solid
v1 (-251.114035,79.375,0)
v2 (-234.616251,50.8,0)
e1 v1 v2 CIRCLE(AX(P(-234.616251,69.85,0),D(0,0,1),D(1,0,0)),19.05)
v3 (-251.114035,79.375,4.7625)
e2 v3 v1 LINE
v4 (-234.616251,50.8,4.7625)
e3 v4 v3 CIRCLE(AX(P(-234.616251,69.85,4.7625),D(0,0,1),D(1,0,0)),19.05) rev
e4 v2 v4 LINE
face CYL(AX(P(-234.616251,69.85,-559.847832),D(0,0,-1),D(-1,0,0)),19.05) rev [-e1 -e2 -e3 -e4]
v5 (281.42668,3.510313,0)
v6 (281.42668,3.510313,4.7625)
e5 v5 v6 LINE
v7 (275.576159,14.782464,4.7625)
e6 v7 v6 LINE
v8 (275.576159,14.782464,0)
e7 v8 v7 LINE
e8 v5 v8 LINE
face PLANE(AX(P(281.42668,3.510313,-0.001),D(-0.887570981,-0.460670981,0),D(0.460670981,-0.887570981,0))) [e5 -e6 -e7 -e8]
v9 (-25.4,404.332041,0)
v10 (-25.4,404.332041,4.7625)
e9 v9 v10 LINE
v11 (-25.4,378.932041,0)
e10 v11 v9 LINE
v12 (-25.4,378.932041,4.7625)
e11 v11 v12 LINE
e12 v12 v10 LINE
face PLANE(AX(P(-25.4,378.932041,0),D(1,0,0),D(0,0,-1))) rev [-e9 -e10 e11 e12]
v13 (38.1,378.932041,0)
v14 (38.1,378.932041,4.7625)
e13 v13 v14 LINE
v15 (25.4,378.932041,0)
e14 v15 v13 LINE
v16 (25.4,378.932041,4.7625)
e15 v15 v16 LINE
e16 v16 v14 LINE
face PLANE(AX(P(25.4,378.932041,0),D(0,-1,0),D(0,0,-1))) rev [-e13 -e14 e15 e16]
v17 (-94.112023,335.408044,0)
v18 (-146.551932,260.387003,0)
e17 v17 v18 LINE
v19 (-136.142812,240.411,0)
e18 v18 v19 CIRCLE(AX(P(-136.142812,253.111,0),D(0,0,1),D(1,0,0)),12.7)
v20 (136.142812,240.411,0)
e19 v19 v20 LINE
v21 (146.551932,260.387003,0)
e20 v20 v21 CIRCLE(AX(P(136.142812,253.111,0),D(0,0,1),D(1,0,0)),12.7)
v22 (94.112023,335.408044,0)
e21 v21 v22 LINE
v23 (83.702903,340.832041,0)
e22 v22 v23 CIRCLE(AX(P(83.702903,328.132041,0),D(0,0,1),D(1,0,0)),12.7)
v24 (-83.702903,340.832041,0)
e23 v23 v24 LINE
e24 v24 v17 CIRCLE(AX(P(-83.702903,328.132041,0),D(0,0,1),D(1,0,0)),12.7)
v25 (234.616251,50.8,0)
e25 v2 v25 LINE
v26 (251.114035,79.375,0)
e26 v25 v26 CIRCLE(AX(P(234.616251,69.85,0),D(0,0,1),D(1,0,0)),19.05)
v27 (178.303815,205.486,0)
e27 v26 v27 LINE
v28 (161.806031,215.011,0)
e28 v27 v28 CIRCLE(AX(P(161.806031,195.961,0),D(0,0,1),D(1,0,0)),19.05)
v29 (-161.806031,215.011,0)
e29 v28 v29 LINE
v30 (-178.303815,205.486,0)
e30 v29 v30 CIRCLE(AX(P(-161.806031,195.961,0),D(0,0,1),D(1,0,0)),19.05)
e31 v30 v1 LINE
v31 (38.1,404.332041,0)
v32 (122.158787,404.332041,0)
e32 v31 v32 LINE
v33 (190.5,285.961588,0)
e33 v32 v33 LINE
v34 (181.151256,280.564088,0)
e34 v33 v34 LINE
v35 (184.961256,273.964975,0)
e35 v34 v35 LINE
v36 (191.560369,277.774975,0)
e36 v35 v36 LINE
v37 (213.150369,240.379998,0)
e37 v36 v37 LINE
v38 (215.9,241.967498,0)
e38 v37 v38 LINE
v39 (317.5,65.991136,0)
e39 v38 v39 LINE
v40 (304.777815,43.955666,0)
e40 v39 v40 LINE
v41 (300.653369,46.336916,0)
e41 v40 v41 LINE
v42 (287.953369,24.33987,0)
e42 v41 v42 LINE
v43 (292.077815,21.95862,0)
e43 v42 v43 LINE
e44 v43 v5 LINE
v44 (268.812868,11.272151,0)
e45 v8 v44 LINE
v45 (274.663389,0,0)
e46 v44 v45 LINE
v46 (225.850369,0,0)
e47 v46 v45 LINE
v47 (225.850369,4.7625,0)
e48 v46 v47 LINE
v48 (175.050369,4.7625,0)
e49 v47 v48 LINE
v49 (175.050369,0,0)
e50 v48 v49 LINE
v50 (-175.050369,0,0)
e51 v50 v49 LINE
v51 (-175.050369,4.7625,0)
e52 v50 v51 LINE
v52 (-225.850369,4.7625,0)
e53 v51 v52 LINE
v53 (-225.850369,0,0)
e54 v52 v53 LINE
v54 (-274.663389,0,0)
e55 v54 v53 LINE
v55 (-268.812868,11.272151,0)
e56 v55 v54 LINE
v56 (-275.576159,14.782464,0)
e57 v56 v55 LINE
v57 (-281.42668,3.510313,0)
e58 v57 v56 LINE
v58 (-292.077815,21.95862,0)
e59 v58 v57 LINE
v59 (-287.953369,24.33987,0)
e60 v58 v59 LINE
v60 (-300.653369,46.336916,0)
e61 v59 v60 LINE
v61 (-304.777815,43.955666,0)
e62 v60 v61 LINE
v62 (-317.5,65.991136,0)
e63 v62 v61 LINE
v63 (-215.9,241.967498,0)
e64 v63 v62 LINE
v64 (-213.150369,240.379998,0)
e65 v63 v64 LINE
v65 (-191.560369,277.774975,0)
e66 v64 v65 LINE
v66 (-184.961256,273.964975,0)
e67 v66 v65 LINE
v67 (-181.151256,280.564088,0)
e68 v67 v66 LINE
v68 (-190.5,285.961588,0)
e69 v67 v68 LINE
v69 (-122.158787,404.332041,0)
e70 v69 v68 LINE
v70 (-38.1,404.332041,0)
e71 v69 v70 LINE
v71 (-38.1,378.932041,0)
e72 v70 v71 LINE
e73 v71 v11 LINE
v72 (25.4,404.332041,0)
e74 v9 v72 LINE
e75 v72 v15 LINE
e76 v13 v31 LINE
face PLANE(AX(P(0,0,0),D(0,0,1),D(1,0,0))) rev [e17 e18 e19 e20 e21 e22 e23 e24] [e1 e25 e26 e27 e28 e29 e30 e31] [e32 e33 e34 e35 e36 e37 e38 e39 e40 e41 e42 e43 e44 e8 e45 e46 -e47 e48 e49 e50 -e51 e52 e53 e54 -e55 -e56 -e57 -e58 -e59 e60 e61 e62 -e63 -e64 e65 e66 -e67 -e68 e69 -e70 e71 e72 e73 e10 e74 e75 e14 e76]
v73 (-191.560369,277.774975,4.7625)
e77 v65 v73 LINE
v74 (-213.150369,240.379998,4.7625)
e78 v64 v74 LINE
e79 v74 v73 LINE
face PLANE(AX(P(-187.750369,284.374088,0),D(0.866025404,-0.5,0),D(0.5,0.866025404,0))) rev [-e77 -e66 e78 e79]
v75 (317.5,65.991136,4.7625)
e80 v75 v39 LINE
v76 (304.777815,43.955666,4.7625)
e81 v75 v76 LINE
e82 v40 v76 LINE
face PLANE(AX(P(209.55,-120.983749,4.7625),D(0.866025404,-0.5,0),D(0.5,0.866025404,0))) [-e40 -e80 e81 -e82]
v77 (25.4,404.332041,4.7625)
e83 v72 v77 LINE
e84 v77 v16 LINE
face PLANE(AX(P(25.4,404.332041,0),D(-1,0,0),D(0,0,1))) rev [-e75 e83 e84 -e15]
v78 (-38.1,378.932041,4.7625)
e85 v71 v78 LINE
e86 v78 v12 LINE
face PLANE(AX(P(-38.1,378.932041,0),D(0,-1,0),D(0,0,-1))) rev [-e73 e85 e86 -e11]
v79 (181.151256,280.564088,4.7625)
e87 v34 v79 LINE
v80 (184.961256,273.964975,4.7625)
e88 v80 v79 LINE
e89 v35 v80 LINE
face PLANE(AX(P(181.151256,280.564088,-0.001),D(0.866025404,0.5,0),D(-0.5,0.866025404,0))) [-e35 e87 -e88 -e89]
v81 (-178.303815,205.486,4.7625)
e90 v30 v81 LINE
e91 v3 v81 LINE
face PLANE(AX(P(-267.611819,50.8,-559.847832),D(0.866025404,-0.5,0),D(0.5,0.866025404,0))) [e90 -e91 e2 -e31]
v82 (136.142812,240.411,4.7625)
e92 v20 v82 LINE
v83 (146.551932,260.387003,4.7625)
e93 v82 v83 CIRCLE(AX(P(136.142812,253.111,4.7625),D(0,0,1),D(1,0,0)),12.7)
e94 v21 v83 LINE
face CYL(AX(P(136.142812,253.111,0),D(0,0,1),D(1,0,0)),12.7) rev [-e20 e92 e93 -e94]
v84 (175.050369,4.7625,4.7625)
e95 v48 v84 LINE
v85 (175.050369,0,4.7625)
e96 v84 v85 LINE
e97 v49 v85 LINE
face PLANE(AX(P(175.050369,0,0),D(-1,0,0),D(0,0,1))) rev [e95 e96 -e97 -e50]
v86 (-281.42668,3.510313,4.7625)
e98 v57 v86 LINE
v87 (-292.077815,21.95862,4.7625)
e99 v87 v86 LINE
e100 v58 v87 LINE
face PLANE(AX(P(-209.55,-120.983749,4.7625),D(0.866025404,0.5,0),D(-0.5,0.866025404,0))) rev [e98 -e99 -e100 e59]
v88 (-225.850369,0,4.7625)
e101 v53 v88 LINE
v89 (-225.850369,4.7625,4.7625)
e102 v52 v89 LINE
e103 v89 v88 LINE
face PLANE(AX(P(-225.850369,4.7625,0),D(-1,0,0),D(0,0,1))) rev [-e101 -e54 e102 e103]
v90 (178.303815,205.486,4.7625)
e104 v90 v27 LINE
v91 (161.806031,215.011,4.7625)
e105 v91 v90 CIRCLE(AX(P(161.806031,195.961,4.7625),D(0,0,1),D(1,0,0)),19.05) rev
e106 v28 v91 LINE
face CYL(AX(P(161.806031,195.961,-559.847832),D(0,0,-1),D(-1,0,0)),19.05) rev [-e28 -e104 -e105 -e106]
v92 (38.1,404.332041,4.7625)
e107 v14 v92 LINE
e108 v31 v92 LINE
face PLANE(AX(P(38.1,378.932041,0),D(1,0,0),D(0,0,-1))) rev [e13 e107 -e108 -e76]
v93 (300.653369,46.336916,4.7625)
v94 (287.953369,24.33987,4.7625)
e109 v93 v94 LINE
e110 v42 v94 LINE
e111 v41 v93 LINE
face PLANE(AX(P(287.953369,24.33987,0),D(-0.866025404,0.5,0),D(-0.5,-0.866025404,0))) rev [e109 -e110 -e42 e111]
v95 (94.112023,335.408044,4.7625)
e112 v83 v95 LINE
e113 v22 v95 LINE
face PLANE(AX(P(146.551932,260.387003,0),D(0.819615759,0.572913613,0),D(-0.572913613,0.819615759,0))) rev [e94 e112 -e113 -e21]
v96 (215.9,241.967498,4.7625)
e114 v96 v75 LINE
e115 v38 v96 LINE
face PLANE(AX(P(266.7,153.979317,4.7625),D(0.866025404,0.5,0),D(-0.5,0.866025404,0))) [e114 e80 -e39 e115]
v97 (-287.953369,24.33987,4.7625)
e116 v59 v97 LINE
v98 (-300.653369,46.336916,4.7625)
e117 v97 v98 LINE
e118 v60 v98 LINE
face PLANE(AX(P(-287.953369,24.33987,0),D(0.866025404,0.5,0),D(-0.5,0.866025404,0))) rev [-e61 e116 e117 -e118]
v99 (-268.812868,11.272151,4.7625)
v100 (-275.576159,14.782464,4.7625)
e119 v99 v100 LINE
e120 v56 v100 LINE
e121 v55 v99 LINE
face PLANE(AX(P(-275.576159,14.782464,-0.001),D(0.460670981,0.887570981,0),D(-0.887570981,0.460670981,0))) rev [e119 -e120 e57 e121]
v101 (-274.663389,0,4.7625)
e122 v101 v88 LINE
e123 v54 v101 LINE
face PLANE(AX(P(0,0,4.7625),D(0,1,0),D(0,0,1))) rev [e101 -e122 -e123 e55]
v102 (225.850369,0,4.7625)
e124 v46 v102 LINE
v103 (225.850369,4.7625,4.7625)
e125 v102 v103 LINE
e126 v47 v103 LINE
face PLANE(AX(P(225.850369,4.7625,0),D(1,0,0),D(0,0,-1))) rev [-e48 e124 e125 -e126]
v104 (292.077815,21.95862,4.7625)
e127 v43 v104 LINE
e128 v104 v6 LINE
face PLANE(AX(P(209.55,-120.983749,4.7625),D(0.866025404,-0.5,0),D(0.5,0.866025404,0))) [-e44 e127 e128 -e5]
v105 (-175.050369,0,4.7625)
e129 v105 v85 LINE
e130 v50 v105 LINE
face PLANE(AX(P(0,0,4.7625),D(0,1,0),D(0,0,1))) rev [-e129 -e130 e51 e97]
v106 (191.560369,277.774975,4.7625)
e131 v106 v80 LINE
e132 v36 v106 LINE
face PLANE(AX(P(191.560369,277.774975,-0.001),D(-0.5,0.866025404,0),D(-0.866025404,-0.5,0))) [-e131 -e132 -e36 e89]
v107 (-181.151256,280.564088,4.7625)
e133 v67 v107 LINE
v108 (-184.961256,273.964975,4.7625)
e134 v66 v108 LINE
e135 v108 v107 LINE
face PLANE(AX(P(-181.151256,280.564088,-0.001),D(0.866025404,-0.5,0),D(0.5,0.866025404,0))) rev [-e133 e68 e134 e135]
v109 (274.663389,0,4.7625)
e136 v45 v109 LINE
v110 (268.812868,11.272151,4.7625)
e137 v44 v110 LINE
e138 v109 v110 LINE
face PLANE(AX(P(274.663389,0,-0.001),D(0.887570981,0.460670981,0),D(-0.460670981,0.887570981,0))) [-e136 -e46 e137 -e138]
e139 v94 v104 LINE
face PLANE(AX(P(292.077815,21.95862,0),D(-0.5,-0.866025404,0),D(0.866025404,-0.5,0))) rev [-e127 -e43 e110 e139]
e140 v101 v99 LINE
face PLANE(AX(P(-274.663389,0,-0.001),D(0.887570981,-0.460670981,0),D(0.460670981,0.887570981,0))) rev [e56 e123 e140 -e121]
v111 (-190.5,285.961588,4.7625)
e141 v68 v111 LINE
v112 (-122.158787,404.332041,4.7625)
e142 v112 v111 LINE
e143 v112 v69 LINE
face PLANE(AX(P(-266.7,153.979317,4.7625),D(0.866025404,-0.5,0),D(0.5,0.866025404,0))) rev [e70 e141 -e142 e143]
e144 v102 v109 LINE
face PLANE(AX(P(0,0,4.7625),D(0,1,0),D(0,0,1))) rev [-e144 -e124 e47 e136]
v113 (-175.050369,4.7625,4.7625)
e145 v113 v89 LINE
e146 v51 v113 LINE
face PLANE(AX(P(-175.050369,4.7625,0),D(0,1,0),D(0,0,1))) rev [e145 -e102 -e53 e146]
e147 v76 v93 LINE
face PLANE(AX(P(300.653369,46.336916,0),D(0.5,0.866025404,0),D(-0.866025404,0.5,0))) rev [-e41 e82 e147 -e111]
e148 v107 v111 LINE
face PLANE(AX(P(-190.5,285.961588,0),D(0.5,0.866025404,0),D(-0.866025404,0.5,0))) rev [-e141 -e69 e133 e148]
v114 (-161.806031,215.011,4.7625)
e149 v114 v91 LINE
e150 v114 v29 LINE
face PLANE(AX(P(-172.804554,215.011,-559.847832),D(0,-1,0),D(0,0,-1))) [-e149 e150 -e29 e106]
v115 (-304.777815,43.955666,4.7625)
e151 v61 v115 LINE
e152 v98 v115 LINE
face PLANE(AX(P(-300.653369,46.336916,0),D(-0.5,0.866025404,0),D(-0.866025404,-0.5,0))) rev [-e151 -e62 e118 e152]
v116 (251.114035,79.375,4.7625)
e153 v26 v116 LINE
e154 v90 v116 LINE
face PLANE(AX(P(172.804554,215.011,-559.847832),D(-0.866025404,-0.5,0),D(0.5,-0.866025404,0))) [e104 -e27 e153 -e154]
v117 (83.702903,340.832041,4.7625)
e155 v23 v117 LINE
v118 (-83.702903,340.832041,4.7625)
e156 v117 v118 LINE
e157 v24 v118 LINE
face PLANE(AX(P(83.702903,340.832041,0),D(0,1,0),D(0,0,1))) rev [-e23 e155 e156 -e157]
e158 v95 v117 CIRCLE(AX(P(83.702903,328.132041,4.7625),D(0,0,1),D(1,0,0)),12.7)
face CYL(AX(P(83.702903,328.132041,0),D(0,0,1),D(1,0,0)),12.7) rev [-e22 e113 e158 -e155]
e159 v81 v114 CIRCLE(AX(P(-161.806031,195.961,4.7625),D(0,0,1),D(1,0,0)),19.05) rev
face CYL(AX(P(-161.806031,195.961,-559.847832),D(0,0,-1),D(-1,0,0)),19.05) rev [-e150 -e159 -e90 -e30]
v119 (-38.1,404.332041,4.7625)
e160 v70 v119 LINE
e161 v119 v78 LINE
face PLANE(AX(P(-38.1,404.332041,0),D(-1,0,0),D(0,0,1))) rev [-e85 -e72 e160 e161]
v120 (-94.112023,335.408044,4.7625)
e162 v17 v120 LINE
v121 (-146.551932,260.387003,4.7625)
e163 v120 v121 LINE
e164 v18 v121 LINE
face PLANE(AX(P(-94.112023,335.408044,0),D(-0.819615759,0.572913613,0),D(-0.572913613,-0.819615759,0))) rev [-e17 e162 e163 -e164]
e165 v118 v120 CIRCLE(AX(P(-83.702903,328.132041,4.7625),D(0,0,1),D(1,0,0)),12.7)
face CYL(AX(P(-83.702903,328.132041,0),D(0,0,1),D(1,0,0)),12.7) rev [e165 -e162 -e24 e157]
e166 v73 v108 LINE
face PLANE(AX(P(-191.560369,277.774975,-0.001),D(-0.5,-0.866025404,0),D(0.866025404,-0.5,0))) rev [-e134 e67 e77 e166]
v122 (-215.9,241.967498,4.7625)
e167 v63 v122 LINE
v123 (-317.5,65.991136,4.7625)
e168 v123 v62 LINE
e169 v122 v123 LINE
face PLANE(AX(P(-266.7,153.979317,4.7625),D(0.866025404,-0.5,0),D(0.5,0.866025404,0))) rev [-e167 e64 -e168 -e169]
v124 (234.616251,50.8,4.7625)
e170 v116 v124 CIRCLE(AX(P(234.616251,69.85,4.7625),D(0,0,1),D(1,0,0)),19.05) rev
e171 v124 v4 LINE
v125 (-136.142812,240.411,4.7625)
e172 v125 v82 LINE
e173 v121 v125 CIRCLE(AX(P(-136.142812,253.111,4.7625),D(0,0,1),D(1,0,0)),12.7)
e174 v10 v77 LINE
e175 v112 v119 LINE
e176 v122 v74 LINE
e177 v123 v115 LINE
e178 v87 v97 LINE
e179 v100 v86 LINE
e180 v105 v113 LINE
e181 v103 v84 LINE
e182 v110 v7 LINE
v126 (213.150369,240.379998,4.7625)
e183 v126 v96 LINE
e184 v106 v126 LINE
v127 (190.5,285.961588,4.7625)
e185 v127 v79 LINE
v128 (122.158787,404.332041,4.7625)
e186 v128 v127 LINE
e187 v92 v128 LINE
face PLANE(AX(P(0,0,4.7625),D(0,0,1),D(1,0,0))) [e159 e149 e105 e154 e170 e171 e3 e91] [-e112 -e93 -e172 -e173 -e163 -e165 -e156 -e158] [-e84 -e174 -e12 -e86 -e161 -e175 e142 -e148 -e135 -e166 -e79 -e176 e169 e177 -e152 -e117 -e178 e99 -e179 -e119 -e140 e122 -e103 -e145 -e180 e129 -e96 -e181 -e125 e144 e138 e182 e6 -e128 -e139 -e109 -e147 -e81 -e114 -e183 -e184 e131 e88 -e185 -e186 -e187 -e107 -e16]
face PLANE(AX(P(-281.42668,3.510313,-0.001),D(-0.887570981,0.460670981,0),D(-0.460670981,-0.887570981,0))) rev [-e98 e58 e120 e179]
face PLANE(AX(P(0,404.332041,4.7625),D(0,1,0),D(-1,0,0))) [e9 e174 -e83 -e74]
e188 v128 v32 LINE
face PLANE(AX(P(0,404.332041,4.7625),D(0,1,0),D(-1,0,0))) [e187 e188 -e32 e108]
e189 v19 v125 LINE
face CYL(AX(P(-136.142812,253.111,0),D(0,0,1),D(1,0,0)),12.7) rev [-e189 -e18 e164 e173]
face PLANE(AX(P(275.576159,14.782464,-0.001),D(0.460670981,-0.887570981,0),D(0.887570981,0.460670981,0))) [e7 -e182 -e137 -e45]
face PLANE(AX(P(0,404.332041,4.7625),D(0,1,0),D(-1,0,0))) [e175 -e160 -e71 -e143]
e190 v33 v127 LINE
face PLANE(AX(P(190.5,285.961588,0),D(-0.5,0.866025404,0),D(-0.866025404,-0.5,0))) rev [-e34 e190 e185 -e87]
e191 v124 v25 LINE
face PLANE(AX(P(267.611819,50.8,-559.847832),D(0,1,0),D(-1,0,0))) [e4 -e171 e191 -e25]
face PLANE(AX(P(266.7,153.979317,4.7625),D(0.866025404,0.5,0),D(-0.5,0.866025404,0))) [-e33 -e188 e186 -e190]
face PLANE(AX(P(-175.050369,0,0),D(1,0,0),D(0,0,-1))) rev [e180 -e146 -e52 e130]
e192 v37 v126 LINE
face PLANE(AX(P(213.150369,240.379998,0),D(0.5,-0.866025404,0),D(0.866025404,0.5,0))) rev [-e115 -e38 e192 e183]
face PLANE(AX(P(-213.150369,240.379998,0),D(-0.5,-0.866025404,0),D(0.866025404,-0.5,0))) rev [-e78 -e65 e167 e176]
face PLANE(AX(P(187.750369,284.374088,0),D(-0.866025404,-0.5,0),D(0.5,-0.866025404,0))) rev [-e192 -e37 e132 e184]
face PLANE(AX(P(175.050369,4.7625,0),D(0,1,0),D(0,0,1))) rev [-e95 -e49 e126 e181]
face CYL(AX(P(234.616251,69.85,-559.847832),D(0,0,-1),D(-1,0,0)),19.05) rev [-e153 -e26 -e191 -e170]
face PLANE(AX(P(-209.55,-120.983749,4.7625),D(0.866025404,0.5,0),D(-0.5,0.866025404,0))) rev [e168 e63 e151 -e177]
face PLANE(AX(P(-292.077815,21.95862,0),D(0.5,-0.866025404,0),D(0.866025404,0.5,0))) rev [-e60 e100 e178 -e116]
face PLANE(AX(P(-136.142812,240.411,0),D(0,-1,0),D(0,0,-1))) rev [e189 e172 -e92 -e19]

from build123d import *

# Parameters (mm, degrees)
BOSS_EXTRUDE1_DEPTH = 4.7625
CUT_EXTRUDE5_DEPTH  = 515.11412225
CUT_EXTRUDE15_DEPTH = 4.7625
FILLET1_R           = 19.05
CUT_EXTRUDE9_DEPTH  = 515.11412225
CUT_EXTRUDE10_DEPTH = 515.11412225
SKETCH4_W           = 50.8
SKETCH4_H           = 4.7625
CUT_EXTRUDE11_DEPTH = 515.11412225
SKETCH14_W          = 12.7
SKETCH14_H          = 25.4
CUT_EXTRUDE12_DEPTH = 515.11412225
CUT_EXTRUDE13_REACH = 516.114
CUT_EXTRUDE14_REACH = 516.114
MIRROR1_DEPTH       = 4.7625


# Read off the part's stored shape, not the designer's step: Mirror1
with BuildPart() as part:
    # Sketch3 → Boss-Extrude1 (new body)
    with BuildSketch(Plane.XY):
        Polygon((-317.5, 65.991135768), (-279.4, 0), (279.4, 0), (317.5, 65.991135768), (122.15878735, 404.332040891), (-122.15878735, 404.332040891), align=None)
    extrude(amount=BOSS_EXTRUDE1_DEPTH)

    # Sketch7 → Cut-Extrude5 (cut, through all)
    with BuildSketch(Plane.XY.offset(4.7625)):
        with BuildLine():
            Line((-136.142811828, 240.411), (136.142811828, 240.411))
            ThreePointArc((136.142811828, 240.411), (147.405476624, 247.242236784), (146.551931965, 260.387002884))
            Line((146.551931965, 260.387002884), (94.11202324, 335.408043775))
            ThreePointArc((94.11202324, 335.408043775), (89.571666319, 339.394705687), (83.702903103, 340.832040891))
            Line((83.702903103, 340.832040891), (-83.702903103, 340.832040891))
            ThreePointArc((-83.702903103, 340.832040891), (-89.571666319, 339.394705687), (-94.11202324, 335.408043775))
            Line((-94.11202324, 335.408043775), (-146.551931965, 260.387002884))
            ThreePointArc((-146.551931965, 260.387002884), (-147.405476624, 247.242236784), (-136.142811828, 240.411))
        make_face()
    extrude(amount=-CUT_EXTRUDE5_DEPTH, mode=Mode.SUBTRACT)

    # Sketch11 → Cut-Extrude15 (cut)
    with BuildSketch(Plane.XY.offset(4.7625)):
        Polygon((-172.804553922, 215.011), (172.804553922, 215.011), (267.611818975, 50.8), (-267.611818975, 50.8), align=None)
    extrude(amount=-CUT_EXTRUDE15_DEPTH, mode=Mode.SUBTRACT)

    # Fillet1
    fillet1_edges = [part.edges().sort_by_distance(p)[0] for p in [
        (172.804553922, 215.011, 2.38125),
        (-172.804553922, 215.011, 2.38125),
        (-267.611818975, 50.8, 2.38125),
        (267.611818975, 50.8, 2.38125),
    ]]
    fillet(fillet1_edges, radius=FILLET1_R)

    # Sketch12 → Cut-Extrude9 (cut, through all)
    with BuildSketch(Plane.XY.offset(4.7625)):
        Polygon((215.9, 241.967497817), (190.5, 285.96158833), (187.750369343, 284.37408833), (213.150369343, 240.379997817), align=None)
        Polygon((-187.750369343, 284.37408833), (-213.150369343, 240.379997817), (-215.9, 241.967497817), (-190.5, 285.96158833), align=None)
    extrude(amount=-CUT_EXTRUDE9_DEPTH, mode=Mode.SUBTRACT)

    # Sketch13 → Cut-Extrude10 (cut, through all)
    with BuildSketch(Plane.XY.offset(4.7625)):
        Polygon((292.077815329, 21.958620278), (287.953369343, 24.339870278), (300.653369343, 46.336915534), (304.777815329, 43.955665534), align=None)
        Polygon((-300.653369343, 46.336915534), (-304.777815329, 43.955665534), (-292.077815329, 21.958620278), (-287.953369343, 24.339870278), align=None)
    extrude(amount=-CUT_EXTRUDE10_DEPTH, mode=Mode.SUBTRACT)

    # Sketch4 → Cut-Extrude11 (cut, through all)
    with BuildSketch(Plane.XY.offset(4.7625)):
        with Locations((200.450369343, 2.38125)):
            Rectangle(SKETCH4_W, SKETCH4_H)
        with Locations((-200.450369343, 2.38125)):
            Rectangle(SKETCH4_W, SKETCH4_H)
    extrude(amount=-CUT_EXTRUDE11_DEPTH, mode=Mode.SUBTRACT)

    # Sketch14 → Cut-Extrude12 (cut, through all)
    with BuildSketch(Plane.XY.offset(4.7625)):
        with Locations((-31.75, 391.632040891)):
            Rectangle(SKETCH14_W, SKETCH14_H)
        with Locations((31.75, 391.632040891)):
            Rectangle(SKETCH14_W, SKETCH14_H)
    extrude(amount=-CUT_EXTRUDE12_DEPTH, mode=Mode.SUBTRACT)

    # Sketch15 → Cut-Extrude13 (cut, up to next)
    with BuildSketch(Plane.XY.offset(4.7625), mode=Mode.PRIVATE) as cut_extrude13_sk1:
        Polygon((-281.426680084, 3.510312876), (-274.663389205, 0), (-268.812867745, 11.272151465), (-275.576158624, 14.782464341), align=None)
    cut_extrude13_tool1 = extrude(cut_extrude13_sk1.sketch, amount=-CUT_EXTRUDE13_REACH, mode=Mode.PRIVATE) & part.part
    add(cut_extrude13_tool1.solids().sort_by_distance((-275.119774, 7.391232, 4.7625))[0], mode=Mode.SUBTRACT)


with BuildPart() as cut_extrude13_kept_piece:
    # of the separate pieces the step leaves, the one the design keeps (cut_extrude13_pieces_kept)
    add(part.part.solids().sort_by_distance((-122.15878735, 404.332040891, 0))[0])

    # Sketch16 → Cut-Extrude14 (cut, up to next)
    with BuildSketch(Plane.XY.offset(4.7625), mode=Mode.PRIVATE) as cut_extrude14_sk1:
        Polygon((-187.750369343, 284.37408833), (-191.560369343, 277.774974753), (-184.961255766, 273.964974753), (-181.151255766, 280.56408833), align=None)
    cut_extrude14_tool1 = extrude(cut_extrude14_sk1.sketch, amount=-CUT_EXTRUDE14_REACH, mode=Mode.PRIVATE) & cut_extrude13_kept_piece.part
    add(cut_extrude14_tool1.solids().sort_by_distance((-186.355813, 279.169532, 4.7625))[0], mode=Mode.SUBTRACT)

    # Mirror1 outline → Mirror1 (cut)
    with BuildSketch(Plane.XY):
        Polygon((191.560369343, 277.774974753), (187.750369343, 284.37408833), (181.151255766, 280.56408833), (184.961255766, 273.964974753), align=None)
        Polygon((281.426680084, 3.510312876), (275.576158624, 14.782464341), (268.812867745, 11.272151465), (274.663389205, 0), (279.4, 0), align=None)
    extrude(amount=MIRROR1_DEPTH, mode=Mode.SUBTRACT)


solid = cut_extrude13_kept_piece.part
